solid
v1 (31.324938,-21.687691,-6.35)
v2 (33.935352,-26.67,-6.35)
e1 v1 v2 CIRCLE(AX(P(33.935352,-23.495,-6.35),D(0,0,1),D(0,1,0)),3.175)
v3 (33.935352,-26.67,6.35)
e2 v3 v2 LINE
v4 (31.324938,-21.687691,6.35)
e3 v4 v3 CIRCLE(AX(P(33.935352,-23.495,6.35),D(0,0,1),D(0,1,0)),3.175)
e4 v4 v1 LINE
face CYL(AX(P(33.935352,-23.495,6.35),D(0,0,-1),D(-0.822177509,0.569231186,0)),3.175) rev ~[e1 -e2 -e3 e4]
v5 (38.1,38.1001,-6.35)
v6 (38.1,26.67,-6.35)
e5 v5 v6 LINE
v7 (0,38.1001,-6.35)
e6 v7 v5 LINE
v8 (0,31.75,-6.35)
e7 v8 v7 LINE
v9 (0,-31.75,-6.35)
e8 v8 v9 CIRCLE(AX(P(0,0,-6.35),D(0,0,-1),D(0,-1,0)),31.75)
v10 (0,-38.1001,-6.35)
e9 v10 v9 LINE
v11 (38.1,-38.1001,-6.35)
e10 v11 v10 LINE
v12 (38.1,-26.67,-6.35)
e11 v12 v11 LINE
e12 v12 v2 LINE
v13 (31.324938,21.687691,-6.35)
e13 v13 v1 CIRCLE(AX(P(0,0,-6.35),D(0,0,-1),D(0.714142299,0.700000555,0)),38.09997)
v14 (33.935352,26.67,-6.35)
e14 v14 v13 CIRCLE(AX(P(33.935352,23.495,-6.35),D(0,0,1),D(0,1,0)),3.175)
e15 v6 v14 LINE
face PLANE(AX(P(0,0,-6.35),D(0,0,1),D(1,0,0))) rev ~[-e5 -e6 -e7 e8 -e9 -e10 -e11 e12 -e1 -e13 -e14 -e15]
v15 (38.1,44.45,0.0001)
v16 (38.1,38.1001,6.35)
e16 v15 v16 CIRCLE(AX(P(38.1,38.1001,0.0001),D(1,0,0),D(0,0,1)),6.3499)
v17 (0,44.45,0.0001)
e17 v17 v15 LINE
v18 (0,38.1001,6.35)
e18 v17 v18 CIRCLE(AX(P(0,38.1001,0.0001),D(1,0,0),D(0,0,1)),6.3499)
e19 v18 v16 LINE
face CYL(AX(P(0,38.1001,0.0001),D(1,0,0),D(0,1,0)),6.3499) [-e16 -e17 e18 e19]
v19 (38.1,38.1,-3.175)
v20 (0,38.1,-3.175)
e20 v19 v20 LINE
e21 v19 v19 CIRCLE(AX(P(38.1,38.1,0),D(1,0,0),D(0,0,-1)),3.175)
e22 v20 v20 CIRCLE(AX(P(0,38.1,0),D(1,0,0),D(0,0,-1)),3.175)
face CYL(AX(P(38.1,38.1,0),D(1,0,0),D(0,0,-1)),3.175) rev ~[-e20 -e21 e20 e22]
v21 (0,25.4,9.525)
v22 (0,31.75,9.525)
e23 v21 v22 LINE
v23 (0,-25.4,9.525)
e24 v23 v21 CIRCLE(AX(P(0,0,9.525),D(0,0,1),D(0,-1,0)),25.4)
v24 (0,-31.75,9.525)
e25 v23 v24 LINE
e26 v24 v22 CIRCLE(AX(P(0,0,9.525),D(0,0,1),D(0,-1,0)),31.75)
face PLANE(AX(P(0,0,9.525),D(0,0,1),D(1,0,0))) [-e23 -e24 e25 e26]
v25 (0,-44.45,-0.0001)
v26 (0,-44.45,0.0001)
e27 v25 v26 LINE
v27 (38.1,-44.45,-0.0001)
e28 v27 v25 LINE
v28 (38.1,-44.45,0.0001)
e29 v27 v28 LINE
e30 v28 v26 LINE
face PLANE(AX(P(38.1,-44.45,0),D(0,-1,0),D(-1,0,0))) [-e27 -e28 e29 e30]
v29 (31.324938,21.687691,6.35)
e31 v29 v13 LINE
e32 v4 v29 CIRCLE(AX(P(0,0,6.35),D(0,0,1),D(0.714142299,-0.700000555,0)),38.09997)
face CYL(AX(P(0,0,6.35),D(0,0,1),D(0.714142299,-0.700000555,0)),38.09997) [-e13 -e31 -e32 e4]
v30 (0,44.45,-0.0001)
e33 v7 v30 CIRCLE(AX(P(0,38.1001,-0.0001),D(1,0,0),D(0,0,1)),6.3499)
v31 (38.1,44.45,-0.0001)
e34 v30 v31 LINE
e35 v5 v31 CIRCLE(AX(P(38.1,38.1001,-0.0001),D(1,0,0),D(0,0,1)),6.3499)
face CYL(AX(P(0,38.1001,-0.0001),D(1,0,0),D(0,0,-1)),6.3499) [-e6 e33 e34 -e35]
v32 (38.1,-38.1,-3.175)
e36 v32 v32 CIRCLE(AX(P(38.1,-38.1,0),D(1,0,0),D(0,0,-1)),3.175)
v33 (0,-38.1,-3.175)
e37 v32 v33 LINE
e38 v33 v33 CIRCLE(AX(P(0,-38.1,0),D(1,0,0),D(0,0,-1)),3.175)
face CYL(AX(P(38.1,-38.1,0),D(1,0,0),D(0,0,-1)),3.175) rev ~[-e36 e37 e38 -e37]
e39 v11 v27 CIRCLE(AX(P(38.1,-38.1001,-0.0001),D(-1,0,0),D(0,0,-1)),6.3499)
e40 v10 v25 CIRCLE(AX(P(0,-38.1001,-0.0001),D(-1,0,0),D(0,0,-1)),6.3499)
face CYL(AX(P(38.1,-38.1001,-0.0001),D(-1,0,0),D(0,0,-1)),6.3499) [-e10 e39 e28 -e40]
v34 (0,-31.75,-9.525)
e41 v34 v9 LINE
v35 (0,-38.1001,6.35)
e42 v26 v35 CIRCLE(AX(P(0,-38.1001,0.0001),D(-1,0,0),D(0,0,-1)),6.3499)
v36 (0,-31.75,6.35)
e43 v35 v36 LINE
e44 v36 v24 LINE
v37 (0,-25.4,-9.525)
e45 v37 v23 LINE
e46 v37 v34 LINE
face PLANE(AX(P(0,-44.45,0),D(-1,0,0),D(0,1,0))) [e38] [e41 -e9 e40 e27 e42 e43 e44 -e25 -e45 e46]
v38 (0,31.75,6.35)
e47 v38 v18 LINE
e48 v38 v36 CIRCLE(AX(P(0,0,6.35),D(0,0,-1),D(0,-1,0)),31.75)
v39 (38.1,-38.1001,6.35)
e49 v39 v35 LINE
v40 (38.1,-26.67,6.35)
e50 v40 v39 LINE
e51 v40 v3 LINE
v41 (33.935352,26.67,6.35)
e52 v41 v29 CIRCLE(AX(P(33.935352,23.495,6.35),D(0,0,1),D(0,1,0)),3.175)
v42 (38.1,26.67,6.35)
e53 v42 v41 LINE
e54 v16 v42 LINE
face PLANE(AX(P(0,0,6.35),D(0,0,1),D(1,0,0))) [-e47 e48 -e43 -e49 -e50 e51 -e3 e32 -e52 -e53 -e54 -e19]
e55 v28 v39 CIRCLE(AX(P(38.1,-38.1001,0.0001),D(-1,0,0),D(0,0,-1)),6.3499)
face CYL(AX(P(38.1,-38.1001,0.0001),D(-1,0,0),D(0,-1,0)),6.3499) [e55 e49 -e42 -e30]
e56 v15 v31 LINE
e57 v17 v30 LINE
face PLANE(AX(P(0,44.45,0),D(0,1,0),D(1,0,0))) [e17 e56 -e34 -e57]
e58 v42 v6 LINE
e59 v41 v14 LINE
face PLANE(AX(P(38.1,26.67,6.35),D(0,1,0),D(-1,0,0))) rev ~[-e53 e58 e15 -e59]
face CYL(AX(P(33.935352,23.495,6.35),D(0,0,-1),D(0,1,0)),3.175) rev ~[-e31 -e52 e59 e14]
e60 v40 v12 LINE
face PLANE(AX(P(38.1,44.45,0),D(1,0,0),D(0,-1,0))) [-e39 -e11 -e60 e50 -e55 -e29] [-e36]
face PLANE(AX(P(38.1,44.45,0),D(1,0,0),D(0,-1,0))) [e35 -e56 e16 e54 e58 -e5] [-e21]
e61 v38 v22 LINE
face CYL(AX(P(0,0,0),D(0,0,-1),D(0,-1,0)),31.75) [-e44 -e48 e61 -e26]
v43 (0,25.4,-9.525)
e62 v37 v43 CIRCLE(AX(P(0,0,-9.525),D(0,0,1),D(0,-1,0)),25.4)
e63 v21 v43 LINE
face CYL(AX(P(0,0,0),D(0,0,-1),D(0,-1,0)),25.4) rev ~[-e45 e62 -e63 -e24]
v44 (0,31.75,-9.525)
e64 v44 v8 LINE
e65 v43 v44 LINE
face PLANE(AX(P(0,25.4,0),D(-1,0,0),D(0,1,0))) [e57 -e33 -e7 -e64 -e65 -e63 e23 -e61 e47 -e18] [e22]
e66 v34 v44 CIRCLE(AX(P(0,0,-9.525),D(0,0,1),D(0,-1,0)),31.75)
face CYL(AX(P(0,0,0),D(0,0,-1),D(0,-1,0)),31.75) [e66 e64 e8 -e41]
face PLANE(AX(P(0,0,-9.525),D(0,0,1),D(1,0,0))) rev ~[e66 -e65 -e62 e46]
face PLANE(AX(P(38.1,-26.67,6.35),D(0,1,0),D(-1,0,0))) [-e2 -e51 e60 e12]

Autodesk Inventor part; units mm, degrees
ref_plane "YZ Plane" through (0, 0, 0) normal (1, 0, 0) x (0, 1, 0)
ref_plane "XZ Plane" through (0, 0, 0) normal (0, 1, 0) x (-1, 0, 0)
ref_plane "XY Plane" through (0, 0, 0) normal (0, 0, 1) x (1, 0, 0)
sketch "Sketch1" plane through (0, 0, 0) normal (0, 0, 1) x (1, 0, 0)
  arc A0 (0, -25.4) -> (0, 25.4) centre (0, 0) ccw
  line L0 (0, 25.4) -> (0, 44.45)
  line L1 (0, 44.45) -> (38.1, 44.45)
  line L2 (38.1, 44.45) -> (38.1, -44.45)
  line L3 (38.1, -44.45) -> (0, -44.45)
  line L4 (0, -44.45) -> (0, -25.4)
  dimension "d1" = 44.45
  dimension "d2" = 38.1
  dimension "d3" = 88.9
  dimension "d4" = 25.4
extrude "Extrusion1" add sketch "Sketch1" along normal mid plane 12.7
sketch "Sketch2" plane through (0, 0, 6.35) normal (0, 0, 1) x (1, 0, 0)
  line L0 (38.1, -44.45) -> (38.1, 44.45) projected
  line L1 (38.1, 26.67) -> (27.2088, 26.67)
  line L2 (38.1, 44.45) -> (0, 44.45) projected
  line L3 (38.1, -26.67) -> (27.2088, -26.67)
  line L4 (0, -44.45) -> (38.1, -44.45) projected
  arc A0 (27.2088, -26.67) -> (27.2088, 26.67) centre (0, 0) ccw
  point P0 (38.1, 0)
  dimension "d7" = 17.78
  dimension "d9" = 38.1
extrude "Extrusion2" cut sketch "Sketch2" against normal through all
sketch "Sketch3" plane through (0, 0, 0) normal (0, 0, 1) x (1, 0, 0)
  arc A0 (0, -31.75) -> (0, 31.75) centre (0, 0) ccw
  arc A1 (0, -25.4) -> (0, 25.4) centre (0, 0) ccw projected
  line L0 (0, 25.4) -> (0, 31.75)
  line L1 (0, 25.4) -> (0, 44.45) projected
  line L2 (0, -25.4) -> (0, -31.75)
  line L3 (0, -44.45) -> (0, -25.4) projected
  line L4 (0, 25.4) -> (0, 31.75)
  line L5 (0, -31.75) -> (0, -25.4)
  dimension "d14" = 31.75
extrude "Extrusion3" add sketch "Sketch3" along normal mid plane 19.05
fillet "Fillet1" radius 3.175 2 edges at (27.2088, -26.67, 0) (27.2088, 26.67, 0)
fillet "Fillet2" radius 6.35 4 edges at (19.05, 44.45, 6.35) (19.05, 44.45, -6.35) (19.05, -44.45, 6.35) (19.05, -44.45, -6.35)
sketch "Sketch4" plane through (38.1, -26.67, 6.35) normal (1, 0, 0) x (0, 0, -1)
  circle A0 centre (6.35, 64.77) radius 3.175
  circle A1 centre (6.35, -11.43) radius 3.175
  arc A2 (0, -11.43) -> (12.7, -11.43) centre (6.35, -11.43) ccw projected
  arc A3 (12.7, 64.77) -> (0, 64.77) centre (6.35, 64.77) ccw projected
  point P0 (6.35, 26.67)
  dimension "d19" = 6.35
extrude "Extrusion4" cut sketch "Sketch4" against normal through all
properties part number "rodcap"
